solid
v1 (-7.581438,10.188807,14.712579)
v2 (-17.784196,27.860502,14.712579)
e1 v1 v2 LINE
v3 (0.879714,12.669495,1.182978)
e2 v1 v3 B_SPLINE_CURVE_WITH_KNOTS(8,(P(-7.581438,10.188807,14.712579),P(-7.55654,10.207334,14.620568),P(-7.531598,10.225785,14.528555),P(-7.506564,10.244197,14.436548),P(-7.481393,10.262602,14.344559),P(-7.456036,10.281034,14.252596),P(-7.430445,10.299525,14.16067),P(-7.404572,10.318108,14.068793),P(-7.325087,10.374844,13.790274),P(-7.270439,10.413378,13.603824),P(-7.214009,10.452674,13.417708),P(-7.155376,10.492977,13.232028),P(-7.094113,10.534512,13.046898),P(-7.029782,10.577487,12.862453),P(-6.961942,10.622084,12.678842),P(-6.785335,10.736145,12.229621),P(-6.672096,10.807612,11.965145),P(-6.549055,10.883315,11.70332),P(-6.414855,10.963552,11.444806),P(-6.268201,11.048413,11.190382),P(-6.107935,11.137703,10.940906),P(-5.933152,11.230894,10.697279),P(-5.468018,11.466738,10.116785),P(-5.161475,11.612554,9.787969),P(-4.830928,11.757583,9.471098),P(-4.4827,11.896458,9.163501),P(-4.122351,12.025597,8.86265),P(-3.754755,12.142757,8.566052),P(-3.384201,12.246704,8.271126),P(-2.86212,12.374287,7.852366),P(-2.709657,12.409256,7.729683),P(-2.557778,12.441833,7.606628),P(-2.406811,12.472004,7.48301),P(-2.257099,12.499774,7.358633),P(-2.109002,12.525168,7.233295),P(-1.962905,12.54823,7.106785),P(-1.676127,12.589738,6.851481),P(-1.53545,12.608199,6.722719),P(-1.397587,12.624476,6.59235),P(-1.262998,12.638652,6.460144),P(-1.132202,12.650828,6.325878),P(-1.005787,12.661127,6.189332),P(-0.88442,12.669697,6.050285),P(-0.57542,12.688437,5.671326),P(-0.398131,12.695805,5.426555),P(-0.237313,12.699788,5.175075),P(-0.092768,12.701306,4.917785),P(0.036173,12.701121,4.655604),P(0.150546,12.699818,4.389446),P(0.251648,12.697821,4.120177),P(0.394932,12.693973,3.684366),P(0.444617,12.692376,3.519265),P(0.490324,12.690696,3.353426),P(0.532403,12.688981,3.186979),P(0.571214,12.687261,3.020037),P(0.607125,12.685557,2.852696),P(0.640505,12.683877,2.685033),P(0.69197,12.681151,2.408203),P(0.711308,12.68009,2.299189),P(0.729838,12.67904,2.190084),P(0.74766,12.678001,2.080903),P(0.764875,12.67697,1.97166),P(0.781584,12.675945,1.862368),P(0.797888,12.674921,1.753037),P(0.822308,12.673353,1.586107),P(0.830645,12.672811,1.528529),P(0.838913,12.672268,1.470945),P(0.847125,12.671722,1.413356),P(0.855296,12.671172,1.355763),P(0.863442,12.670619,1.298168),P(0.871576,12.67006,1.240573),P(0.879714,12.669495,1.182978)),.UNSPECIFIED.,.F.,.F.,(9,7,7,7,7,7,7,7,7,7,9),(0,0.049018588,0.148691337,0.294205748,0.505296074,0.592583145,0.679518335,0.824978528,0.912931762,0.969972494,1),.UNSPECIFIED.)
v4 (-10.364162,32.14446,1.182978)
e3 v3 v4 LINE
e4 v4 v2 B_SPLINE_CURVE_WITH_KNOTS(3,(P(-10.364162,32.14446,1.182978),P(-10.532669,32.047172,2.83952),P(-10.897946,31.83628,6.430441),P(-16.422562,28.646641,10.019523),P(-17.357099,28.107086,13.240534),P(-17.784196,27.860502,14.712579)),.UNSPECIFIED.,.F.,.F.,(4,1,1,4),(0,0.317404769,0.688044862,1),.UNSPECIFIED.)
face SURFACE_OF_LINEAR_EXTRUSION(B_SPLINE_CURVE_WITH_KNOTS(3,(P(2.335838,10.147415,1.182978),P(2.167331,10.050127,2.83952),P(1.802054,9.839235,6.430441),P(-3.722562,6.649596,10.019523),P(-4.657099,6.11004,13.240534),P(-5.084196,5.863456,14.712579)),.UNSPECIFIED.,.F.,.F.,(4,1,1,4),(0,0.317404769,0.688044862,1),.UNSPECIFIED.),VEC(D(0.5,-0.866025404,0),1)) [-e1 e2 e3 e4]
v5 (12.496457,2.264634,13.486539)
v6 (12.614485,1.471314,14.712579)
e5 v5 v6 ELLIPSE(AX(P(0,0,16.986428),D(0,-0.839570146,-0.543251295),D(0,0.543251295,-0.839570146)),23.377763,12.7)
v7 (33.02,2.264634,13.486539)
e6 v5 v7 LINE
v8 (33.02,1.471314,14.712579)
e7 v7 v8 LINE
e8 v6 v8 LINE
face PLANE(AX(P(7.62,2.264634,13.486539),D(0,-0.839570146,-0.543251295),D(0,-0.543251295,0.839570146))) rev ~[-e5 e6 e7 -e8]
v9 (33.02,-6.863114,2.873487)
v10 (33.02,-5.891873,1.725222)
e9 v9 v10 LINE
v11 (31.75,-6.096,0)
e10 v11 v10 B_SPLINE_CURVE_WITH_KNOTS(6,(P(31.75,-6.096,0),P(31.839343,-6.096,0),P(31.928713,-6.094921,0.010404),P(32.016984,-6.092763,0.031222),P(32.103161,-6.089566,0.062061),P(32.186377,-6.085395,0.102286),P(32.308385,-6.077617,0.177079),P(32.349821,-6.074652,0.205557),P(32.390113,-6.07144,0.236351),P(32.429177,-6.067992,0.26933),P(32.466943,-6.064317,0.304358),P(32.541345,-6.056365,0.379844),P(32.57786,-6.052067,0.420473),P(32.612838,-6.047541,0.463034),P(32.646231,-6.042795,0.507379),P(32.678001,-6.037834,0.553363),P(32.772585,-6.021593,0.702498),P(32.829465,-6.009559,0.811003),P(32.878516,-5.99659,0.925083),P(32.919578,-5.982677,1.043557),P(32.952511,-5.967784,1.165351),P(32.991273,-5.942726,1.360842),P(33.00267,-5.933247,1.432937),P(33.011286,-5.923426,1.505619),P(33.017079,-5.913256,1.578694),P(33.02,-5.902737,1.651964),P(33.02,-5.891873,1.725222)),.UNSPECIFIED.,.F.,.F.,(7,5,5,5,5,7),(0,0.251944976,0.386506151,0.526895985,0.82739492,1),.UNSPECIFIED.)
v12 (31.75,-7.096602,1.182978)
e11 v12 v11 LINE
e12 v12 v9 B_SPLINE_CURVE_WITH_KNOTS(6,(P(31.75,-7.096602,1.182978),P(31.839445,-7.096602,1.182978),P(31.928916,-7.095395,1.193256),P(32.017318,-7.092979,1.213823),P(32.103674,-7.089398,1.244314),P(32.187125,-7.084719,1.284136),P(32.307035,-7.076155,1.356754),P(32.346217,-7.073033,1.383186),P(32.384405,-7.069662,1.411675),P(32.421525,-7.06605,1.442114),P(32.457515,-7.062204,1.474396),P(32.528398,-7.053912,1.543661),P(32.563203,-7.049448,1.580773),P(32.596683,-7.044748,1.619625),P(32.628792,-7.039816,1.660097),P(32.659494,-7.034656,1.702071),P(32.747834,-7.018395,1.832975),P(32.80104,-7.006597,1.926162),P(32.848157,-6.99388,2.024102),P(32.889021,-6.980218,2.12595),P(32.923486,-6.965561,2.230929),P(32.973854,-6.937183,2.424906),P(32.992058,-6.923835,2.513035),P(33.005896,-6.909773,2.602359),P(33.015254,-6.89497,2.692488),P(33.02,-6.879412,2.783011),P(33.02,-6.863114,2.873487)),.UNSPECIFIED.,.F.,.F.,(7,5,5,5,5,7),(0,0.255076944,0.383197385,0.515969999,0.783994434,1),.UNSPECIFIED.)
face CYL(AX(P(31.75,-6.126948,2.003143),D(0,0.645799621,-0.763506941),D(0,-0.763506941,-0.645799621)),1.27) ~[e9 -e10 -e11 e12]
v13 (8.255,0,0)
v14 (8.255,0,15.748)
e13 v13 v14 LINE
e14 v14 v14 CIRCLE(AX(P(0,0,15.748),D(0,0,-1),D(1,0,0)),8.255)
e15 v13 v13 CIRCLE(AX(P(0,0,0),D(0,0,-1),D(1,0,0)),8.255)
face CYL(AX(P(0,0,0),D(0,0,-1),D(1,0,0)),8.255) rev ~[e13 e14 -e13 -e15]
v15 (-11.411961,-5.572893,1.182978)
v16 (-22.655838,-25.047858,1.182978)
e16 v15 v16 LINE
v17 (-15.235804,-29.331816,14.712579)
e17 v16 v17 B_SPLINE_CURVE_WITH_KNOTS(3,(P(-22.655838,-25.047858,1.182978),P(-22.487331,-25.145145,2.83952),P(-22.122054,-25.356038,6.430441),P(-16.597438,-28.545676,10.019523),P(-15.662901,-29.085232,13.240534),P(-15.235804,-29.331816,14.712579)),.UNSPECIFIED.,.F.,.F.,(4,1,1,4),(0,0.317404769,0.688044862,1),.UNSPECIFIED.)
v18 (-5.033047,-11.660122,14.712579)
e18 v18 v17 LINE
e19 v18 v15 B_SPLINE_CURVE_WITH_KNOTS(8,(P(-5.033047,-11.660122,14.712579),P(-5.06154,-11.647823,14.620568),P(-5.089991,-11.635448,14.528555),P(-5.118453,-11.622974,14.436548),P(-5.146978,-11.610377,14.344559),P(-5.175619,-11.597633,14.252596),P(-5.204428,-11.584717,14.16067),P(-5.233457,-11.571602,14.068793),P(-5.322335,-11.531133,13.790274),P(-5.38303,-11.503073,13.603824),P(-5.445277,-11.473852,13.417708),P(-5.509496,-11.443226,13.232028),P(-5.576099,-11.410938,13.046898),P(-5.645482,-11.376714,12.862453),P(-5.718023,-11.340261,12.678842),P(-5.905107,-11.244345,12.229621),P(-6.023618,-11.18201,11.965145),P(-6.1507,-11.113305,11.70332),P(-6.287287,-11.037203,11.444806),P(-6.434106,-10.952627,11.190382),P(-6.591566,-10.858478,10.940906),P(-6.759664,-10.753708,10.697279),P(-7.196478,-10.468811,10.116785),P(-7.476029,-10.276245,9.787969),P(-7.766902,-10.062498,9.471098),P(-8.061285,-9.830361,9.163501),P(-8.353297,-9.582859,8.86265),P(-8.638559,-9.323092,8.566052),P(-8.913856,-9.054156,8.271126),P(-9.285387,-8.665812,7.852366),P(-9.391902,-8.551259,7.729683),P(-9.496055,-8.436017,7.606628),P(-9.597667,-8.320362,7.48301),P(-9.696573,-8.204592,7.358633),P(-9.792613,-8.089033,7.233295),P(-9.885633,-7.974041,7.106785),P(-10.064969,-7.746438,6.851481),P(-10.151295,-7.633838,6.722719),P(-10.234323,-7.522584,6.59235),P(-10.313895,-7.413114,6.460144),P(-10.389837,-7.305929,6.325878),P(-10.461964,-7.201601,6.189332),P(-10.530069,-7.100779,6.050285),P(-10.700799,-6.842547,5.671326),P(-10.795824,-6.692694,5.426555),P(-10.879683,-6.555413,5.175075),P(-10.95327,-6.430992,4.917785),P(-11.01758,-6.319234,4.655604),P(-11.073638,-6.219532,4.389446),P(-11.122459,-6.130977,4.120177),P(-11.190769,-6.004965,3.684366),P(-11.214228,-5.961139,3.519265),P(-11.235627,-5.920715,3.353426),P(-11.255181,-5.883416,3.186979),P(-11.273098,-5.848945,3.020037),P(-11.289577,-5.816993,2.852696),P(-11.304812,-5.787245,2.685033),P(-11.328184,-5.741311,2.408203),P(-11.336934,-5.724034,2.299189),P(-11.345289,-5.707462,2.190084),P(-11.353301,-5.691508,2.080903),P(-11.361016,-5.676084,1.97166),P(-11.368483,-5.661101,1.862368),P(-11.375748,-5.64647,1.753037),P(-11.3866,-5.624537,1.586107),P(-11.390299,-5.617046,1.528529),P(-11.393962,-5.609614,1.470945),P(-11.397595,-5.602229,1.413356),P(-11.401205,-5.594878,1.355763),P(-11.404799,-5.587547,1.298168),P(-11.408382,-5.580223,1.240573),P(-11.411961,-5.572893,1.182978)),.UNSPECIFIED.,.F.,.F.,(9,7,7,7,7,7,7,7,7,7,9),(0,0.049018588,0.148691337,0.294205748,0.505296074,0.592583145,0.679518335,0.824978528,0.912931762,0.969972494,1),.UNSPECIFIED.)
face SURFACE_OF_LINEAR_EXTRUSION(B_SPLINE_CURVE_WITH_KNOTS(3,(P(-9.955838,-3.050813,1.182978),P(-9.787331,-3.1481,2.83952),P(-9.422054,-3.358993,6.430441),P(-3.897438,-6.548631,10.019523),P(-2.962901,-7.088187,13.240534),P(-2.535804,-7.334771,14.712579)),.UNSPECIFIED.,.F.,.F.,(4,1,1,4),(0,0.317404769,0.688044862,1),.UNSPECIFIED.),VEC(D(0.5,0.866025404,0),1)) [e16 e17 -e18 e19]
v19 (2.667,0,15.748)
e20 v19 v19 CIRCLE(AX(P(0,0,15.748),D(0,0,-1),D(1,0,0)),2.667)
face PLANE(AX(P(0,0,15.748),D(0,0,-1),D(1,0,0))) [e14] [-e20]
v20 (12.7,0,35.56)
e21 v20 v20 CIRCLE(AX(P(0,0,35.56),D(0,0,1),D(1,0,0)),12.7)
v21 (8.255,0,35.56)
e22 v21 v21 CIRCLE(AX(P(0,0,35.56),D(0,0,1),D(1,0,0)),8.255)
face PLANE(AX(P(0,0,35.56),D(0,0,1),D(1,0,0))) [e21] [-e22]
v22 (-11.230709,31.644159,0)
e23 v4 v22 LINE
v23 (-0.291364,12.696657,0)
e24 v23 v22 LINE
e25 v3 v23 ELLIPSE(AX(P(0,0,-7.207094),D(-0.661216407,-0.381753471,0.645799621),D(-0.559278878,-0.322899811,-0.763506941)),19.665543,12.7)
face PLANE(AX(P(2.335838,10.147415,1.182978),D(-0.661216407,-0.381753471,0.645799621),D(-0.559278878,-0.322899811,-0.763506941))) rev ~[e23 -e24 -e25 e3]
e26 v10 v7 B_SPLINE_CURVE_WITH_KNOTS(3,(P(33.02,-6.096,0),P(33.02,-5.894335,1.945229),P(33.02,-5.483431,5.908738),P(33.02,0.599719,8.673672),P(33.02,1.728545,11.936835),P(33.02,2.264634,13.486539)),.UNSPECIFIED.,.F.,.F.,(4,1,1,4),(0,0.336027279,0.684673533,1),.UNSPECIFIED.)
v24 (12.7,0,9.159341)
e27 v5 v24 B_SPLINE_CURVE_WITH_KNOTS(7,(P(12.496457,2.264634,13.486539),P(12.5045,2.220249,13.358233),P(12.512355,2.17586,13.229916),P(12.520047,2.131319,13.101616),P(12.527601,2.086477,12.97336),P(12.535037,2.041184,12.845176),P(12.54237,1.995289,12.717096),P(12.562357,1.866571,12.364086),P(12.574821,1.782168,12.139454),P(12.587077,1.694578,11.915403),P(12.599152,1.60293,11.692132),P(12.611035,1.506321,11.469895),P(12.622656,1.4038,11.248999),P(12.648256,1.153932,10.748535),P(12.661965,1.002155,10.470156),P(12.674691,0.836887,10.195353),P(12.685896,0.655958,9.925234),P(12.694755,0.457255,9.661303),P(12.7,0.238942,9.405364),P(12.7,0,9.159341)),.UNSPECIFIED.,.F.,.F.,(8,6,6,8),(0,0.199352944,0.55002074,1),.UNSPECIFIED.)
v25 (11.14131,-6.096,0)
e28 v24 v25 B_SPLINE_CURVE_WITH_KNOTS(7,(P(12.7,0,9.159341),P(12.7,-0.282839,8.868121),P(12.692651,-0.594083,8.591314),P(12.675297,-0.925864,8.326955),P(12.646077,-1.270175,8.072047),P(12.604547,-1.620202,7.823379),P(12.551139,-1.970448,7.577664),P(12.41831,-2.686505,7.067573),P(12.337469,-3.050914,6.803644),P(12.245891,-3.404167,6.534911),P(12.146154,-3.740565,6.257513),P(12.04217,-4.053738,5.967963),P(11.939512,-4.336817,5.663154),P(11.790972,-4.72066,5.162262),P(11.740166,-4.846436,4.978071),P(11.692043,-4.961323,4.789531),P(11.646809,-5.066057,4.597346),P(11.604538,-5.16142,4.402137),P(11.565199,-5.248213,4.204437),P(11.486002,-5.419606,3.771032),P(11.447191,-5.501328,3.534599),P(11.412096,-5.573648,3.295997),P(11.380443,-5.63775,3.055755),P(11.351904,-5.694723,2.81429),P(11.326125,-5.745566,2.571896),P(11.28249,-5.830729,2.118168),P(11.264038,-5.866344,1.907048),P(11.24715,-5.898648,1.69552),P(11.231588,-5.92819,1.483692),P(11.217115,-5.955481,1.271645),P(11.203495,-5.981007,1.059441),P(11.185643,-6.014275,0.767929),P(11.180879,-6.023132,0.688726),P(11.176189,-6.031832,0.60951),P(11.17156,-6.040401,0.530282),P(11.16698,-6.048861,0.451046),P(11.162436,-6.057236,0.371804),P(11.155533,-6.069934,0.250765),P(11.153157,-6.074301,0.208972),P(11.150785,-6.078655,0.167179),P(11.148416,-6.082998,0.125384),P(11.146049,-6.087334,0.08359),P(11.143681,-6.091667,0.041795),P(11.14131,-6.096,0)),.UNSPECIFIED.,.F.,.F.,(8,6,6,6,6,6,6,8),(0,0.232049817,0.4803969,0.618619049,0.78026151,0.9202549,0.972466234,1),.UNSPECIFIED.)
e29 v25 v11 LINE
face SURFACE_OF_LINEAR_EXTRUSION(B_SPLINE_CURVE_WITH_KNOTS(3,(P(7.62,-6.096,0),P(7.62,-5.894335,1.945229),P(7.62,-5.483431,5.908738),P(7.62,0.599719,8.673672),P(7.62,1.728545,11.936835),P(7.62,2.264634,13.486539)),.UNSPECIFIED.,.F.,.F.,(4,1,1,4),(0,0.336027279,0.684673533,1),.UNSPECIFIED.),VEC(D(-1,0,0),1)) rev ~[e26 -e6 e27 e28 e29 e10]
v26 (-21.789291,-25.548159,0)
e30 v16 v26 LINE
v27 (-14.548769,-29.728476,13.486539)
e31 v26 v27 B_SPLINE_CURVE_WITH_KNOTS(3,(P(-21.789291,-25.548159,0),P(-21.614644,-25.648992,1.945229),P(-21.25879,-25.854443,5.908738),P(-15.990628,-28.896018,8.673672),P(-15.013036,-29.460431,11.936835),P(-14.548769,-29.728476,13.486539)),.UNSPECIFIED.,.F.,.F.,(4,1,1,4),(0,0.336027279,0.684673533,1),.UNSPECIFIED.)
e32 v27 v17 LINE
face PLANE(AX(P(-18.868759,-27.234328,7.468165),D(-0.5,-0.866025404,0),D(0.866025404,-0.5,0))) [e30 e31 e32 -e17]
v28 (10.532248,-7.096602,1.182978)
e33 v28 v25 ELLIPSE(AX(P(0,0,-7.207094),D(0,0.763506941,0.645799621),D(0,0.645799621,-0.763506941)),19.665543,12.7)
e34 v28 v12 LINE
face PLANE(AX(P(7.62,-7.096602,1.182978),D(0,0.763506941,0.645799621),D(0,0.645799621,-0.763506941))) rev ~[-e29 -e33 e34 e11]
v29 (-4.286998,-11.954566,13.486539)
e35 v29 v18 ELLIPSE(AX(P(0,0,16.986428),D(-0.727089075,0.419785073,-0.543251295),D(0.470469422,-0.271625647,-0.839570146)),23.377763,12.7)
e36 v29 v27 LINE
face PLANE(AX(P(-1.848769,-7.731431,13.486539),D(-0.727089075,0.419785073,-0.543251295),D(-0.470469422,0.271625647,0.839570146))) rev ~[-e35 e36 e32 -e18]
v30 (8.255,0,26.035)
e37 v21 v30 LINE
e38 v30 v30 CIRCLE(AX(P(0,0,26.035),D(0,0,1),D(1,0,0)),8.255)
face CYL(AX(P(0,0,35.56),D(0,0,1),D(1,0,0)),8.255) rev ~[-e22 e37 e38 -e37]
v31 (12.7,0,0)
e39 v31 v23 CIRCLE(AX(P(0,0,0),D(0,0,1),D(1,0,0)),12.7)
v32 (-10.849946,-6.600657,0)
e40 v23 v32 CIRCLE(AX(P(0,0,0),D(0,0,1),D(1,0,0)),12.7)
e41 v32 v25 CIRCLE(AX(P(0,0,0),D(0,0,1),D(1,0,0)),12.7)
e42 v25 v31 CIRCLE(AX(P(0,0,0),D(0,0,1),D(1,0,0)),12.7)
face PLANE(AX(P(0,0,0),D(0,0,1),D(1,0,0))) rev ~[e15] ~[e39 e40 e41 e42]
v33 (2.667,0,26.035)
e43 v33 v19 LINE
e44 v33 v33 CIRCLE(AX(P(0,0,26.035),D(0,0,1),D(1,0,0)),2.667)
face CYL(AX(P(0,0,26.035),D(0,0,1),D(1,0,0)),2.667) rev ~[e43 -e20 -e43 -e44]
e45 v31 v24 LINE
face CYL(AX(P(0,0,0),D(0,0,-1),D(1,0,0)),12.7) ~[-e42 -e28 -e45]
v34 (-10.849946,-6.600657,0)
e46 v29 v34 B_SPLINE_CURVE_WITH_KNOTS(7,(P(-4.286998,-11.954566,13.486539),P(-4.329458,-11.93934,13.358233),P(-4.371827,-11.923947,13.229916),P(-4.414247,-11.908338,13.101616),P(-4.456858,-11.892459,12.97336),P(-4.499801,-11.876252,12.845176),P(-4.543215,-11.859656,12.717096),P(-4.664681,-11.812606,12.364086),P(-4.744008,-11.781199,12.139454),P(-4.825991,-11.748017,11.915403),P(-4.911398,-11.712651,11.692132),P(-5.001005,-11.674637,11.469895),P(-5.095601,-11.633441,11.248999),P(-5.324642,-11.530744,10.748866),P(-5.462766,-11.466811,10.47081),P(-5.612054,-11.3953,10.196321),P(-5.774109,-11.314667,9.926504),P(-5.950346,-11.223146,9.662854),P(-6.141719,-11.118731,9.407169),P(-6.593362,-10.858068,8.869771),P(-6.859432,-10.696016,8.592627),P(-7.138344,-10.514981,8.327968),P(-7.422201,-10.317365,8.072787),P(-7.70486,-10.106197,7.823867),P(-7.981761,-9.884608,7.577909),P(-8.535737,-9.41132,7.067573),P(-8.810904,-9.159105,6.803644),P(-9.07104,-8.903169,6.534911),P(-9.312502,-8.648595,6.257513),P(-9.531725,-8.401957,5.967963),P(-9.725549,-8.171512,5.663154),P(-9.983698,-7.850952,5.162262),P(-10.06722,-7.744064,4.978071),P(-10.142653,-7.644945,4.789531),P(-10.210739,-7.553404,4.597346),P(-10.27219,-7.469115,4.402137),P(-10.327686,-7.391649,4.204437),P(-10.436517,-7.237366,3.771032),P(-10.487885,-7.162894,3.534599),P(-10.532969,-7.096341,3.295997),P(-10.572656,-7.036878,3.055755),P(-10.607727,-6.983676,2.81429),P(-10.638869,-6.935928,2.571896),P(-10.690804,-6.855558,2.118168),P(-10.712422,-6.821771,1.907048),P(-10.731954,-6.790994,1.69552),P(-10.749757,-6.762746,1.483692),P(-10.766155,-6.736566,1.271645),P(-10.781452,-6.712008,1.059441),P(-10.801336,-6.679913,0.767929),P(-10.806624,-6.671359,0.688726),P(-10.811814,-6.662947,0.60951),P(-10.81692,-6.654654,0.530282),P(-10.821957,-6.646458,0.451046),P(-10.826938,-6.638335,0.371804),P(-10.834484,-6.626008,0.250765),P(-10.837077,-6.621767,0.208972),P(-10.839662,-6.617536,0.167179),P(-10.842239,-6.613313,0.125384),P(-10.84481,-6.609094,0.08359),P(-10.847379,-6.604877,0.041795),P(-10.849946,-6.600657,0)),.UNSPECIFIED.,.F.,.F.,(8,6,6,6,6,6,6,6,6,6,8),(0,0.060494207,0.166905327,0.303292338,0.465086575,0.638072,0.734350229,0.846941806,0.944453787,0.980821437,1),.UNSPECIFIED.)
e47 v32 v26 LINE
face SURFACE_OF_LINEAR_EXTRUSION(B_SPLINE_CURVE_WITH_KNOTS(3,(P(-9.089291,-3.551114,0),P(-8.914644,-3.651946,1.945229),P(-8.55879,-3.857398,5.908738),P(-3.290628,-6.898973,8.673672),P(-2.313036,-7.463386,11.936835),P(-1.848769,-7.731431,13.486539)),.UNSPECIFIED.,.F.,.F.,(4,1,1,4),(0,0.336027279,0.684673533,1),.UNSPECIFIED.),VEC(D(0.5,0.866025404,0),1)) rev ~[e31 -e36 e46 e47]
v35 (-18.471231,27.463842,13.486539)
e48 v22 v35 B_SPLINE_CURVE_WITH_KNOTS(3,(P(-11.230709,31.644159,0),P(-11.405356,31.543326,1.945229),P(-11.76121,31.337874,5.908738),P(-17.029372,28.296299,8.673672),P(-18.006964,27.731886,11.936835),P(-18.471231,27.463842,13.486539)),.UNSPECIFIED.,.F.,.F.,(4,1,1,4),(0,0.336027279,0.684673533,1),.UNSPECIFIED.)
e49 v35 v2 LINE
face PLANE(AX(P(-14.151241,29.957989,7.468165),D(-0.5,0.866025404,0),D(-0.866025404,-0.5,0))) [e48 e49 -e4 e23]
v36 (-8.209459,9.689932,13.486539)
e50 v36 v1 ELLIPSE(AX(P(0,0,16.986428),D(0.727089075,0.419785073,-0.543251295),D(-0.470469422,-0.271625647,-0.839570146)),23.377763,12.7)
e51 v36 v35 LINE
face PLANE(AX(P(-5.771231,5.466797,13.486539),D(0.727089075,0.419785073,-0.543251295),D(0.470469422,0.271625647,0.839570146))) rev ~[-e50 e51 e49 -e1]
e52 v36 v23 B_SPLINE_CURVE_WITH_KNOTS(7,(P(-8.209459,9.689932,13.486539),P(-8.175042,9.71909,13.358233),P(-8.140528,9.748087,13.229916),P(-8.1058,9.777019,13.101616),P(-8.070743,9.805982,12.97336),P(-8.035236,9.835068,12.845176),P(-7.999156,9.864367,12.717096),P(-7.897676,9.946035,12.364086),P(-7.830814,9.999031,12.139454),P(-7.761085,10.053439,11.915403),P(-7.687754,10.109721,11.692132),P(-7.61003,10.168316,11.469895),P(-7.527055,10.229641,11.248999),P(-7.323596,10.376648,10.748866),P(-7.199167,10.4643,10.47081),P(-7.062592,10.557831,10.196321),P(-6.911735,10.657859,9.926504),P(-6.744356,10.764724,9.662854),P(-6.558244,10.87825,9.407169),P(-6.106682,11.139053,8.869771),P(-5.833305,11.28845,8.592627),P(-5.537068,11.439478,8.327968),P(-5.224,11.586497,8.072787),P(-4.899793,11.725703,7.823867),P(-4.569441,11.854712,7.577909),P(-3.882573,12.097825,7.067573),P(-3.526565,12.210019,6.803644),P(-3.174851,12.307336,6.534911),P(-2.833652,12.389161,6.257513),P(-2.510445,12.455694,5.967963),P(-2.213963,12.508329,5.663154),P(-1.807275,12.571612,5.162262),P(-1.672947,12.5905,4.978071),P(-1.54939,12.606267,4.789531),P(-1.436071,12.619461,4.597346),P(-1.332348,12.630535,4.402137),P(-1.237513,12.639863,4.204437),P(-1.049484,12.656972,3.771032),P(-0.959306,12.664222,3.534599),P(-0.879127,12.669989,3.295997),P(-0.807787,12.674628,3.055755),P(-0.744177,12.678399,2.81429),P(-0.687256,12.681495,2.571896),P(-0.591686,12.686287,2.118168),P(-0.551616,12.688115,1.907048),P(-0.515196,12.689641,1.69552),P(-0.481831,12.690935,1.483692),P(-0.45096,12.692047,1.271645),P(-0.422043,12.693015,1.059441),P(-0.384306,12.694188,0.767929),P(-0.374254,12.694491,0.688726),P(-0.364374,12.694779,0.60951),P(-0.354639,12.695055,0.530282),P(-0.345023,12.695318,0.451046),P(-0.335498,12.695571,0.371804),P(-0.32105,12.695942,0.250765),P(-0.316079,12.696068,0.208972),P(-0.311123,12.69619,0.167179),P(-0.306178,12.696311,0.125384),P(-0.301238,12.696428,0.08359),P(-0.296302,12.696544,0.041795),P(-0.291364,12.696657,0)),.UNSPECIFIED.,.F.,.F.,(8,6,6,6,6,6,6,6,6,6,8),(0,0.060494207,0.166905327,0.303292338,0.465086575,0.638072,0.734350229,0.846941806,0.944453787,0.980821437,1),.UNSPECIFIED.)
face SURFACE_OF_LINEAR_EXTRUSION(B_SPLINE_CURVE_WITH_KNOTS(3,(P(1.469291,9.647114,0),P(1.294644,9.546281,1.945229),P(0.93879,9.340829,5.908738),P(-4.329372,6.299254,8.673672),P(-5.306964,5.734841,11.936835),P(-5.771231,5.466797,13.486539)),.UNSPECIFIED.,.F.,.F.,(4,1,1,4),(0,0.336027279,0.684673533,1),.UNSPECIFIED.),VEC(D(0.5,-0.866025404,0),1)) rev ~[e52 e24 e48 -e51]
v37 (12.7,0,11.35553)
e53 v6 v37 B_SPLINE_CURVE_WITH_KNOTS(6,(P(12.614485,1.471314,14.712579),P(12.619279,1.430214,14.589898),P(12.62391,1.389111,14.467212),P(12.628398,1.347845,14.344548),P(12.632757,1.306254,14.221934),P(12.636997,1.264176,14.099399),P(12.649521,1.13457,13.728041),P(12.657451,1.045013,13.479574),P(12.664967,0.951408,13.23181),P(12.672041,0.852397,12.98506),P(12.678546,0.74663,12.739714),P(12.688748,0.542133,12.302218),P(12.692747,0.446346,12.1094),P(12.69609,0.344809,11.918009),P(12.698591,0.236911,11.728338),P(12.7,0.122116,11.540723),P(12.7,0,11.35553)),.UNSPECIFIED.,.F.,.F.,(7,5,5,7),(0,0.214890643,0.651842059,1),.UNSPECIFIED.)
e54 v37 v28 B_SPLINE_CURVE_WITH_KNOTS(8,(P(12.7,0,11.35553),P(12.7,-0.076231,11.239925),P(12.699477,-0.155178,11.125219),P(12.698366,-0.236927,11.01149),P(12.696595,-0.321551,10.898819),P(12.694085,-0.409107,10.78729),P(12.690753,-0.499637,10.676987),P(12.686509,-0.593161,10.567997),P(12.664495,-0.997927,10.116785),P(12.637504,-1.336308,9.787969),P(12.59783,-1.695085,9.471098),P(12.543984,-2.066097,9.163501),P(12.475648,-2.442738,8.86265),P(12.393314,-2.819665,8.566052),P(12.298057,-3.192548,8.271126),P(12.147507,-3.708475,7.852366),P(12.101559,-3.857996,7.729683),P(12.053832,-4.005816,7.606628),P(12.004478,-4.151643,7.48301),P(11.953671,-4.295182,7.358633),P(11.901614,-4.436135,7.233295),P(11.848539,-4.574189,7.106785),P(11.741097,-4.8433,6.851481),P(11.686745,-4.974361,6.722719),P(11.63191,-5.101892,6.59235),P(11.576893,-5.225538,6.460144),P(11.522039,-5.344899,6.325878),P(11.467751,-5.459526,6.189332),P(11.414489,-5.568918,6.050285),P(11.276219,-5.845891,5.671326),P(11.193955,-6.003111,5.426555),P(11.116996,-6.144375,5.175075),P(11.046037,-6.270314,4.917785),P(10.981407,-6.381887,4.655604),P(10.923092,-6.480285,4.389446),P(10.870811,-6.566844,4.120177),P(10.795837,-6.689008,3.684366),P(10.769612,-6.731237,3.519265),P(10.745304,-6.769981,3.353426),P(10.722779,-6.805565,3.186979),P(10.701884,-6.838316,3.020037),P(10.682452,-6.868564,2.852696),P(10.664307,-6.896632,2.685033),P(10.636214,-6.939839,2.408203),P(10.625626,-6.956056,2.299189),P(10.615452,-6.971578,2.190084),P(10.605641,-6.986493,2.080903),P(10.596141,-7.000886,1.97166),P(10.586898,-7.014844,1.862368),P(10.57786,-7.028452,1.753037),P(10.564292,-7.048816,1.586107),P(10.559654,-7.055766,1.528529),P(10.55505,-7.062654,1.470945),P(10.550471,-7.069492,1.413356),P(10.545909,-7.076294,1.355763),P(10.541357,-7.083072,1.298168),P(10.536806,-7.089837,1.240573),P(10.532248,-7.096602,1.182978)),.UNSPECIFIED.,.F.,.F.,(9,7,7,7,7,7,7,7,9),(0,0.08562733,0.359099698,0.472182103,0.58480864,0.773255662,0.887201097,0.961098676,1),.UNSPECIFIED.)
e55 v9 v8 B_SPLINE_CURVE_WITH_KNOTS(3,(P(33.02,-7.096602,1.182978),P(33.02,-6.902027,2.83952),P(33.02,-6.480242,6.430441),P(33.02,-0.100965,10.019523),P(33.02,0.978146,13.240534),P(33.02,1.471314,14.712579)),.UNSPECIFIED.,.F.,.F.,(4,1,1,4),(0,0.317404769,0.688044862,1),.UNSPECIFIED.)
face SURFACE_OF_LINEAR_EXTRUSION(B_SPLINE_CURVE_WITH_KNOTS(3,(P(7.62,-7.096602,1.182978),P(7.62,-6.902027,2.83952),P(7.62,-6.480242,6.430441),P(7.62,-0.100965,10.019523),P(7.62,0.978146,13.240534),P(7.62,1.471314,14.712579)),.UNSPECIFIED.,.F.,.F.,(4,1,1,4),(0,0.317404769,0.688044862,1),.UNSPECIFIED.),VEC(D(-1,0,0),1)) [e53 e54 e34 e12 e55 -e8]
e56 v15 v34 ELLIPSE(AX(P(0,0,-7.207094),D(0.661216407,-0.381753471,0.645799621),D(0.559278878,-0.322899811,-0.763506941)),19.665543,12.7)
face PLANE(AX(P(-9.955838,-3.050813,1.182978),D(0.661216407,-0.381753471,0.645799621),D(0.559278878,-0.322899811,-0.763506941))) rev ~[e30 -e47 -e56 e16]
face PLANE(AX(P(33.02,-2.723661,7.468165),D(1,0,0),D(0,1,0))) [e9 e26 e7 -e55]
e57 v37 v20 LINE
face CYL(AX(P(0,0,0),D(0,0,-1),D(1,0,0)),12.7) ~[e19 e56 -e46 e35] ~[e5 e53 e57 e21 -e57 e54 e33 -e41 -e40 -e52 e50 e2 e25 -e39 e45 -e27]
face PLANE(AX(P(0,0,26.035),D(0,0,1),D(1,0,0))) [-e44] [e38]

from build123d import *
from build123d import SkipClean  # not in build123d's __all__

# Parameters (mm, degrees)
F0_R            = 12.7
F1_DEPTH        = 35.56
F2_R            = 8.255
F3_DEPTH        = 9.525
F4_R            = 2.667
F5_DEPTH        = 254
F9_DEPTH        = 25.4
F9_COPIES_COUNT = 3
F10_R           = 1.27
F6_R            = 8.255
F6_R_2          = 2.667
F11_DEPTH       = 15.748


# Not quite as in the source:
# - a pattern or mirror of a feature is missing from the dataset's text; its kind, count and spacing are read off the source's solid
# - a feature names something its author has since deleted; it is built from what else it names


with BuildPart() as f1:
    # F0 (on Top) → F1 (new body)
    with BuildSketch(Plane.XY):
        Circle(F0_R)
    extrude(amount=F1_DEPTH)

    # F2 (on face) → F3 (cut)
    with BuildSketch(Plane.XY.offset(35.56)):
        Circle(F2_R)
    extrude(amount=-F3_DEPTH, mode=Mode.SUBTRACT)

    # F4 (on face) → F5 (cut)
    with BuildSketch(Plane.XY.offset(26.035)):
        Circle(F4_R)
    extrude(amount=-F5_DEPTH, mode=Mode.SUBTRACT)

    # F8 (on offset) → F9 (join)
    with BuildSketch(Plane.YZ.offset(7.62)):
        with BuildLine():
            Line((-7.096601933, 1.1829776548), (-6.096, 0))
            add(Edge.make_bspline(
                [(-6.096, 0), (-5.8943346547, 1.9452293607), (-5.4834307395, 5.9087381092), (0.5997187932, 8.6736721856), (1.7285446911, 11.9368345808), (2.2646340076, 13.4865390137)],
                knots=[0, 0, 0, 0, 0.3360272787, 0.6846735329, 1, 1, 1, 1], degree=3))
            Line((2.2646340076, 13.4865390137), (1.47131423, 14.712578617))
            add(Edge.make_bspline(
                [(-7.096601933, 1.1829776548), (-6.9020267489, 2.8395199903), (-6.4802421103, 6.4304409685), (-0.1009646663, 10.0195226908), (0.978146166, 13.2405336059), (1.47131423, 14.712578617)],
                knots=[0, 0, 0, 0, 0.3174047687, 0.6880448619, 1, 1, 1, 1], degree=3))
        make_face()
    with SkipClean():  # cleaning this boolean's faces spoils the solid; the shape is the same uncleaned
        f9 = extrude(amount=F9_DEPTH)

    # F9_copies: F9 ×3 about axis
    f9_copies_axis = Axis((0, 0, 0), (0, 0, 1))
    for i in range(1, F9_COPIES_COUNT):
        add(f9.rotate(f9_copies_axis, i * 360 / F9_COPIES_COUNT), clean=False)

    # F10
    f10_edges = [f1.edges().sort_by_distance(p)[0] for p in [
        (33.02, -6.596301, 0.591489),
    ]]
    fillet(f10_edges, radius=F10_R)

    # F6 (on face) → F11 (cut)
    with BuildSketch(Plane(origin=(0, 0, 0), x_dir=(1, 0, 0), z_dir=(0, 0, -1))):
        Circle(F6_R)
        Circle(F6_R_2, mode=Mode.SUBTRACT)
    extrude(amount=-F11_DEPTH, mode=Mode.SUBTRACT)


solid = f1.part
